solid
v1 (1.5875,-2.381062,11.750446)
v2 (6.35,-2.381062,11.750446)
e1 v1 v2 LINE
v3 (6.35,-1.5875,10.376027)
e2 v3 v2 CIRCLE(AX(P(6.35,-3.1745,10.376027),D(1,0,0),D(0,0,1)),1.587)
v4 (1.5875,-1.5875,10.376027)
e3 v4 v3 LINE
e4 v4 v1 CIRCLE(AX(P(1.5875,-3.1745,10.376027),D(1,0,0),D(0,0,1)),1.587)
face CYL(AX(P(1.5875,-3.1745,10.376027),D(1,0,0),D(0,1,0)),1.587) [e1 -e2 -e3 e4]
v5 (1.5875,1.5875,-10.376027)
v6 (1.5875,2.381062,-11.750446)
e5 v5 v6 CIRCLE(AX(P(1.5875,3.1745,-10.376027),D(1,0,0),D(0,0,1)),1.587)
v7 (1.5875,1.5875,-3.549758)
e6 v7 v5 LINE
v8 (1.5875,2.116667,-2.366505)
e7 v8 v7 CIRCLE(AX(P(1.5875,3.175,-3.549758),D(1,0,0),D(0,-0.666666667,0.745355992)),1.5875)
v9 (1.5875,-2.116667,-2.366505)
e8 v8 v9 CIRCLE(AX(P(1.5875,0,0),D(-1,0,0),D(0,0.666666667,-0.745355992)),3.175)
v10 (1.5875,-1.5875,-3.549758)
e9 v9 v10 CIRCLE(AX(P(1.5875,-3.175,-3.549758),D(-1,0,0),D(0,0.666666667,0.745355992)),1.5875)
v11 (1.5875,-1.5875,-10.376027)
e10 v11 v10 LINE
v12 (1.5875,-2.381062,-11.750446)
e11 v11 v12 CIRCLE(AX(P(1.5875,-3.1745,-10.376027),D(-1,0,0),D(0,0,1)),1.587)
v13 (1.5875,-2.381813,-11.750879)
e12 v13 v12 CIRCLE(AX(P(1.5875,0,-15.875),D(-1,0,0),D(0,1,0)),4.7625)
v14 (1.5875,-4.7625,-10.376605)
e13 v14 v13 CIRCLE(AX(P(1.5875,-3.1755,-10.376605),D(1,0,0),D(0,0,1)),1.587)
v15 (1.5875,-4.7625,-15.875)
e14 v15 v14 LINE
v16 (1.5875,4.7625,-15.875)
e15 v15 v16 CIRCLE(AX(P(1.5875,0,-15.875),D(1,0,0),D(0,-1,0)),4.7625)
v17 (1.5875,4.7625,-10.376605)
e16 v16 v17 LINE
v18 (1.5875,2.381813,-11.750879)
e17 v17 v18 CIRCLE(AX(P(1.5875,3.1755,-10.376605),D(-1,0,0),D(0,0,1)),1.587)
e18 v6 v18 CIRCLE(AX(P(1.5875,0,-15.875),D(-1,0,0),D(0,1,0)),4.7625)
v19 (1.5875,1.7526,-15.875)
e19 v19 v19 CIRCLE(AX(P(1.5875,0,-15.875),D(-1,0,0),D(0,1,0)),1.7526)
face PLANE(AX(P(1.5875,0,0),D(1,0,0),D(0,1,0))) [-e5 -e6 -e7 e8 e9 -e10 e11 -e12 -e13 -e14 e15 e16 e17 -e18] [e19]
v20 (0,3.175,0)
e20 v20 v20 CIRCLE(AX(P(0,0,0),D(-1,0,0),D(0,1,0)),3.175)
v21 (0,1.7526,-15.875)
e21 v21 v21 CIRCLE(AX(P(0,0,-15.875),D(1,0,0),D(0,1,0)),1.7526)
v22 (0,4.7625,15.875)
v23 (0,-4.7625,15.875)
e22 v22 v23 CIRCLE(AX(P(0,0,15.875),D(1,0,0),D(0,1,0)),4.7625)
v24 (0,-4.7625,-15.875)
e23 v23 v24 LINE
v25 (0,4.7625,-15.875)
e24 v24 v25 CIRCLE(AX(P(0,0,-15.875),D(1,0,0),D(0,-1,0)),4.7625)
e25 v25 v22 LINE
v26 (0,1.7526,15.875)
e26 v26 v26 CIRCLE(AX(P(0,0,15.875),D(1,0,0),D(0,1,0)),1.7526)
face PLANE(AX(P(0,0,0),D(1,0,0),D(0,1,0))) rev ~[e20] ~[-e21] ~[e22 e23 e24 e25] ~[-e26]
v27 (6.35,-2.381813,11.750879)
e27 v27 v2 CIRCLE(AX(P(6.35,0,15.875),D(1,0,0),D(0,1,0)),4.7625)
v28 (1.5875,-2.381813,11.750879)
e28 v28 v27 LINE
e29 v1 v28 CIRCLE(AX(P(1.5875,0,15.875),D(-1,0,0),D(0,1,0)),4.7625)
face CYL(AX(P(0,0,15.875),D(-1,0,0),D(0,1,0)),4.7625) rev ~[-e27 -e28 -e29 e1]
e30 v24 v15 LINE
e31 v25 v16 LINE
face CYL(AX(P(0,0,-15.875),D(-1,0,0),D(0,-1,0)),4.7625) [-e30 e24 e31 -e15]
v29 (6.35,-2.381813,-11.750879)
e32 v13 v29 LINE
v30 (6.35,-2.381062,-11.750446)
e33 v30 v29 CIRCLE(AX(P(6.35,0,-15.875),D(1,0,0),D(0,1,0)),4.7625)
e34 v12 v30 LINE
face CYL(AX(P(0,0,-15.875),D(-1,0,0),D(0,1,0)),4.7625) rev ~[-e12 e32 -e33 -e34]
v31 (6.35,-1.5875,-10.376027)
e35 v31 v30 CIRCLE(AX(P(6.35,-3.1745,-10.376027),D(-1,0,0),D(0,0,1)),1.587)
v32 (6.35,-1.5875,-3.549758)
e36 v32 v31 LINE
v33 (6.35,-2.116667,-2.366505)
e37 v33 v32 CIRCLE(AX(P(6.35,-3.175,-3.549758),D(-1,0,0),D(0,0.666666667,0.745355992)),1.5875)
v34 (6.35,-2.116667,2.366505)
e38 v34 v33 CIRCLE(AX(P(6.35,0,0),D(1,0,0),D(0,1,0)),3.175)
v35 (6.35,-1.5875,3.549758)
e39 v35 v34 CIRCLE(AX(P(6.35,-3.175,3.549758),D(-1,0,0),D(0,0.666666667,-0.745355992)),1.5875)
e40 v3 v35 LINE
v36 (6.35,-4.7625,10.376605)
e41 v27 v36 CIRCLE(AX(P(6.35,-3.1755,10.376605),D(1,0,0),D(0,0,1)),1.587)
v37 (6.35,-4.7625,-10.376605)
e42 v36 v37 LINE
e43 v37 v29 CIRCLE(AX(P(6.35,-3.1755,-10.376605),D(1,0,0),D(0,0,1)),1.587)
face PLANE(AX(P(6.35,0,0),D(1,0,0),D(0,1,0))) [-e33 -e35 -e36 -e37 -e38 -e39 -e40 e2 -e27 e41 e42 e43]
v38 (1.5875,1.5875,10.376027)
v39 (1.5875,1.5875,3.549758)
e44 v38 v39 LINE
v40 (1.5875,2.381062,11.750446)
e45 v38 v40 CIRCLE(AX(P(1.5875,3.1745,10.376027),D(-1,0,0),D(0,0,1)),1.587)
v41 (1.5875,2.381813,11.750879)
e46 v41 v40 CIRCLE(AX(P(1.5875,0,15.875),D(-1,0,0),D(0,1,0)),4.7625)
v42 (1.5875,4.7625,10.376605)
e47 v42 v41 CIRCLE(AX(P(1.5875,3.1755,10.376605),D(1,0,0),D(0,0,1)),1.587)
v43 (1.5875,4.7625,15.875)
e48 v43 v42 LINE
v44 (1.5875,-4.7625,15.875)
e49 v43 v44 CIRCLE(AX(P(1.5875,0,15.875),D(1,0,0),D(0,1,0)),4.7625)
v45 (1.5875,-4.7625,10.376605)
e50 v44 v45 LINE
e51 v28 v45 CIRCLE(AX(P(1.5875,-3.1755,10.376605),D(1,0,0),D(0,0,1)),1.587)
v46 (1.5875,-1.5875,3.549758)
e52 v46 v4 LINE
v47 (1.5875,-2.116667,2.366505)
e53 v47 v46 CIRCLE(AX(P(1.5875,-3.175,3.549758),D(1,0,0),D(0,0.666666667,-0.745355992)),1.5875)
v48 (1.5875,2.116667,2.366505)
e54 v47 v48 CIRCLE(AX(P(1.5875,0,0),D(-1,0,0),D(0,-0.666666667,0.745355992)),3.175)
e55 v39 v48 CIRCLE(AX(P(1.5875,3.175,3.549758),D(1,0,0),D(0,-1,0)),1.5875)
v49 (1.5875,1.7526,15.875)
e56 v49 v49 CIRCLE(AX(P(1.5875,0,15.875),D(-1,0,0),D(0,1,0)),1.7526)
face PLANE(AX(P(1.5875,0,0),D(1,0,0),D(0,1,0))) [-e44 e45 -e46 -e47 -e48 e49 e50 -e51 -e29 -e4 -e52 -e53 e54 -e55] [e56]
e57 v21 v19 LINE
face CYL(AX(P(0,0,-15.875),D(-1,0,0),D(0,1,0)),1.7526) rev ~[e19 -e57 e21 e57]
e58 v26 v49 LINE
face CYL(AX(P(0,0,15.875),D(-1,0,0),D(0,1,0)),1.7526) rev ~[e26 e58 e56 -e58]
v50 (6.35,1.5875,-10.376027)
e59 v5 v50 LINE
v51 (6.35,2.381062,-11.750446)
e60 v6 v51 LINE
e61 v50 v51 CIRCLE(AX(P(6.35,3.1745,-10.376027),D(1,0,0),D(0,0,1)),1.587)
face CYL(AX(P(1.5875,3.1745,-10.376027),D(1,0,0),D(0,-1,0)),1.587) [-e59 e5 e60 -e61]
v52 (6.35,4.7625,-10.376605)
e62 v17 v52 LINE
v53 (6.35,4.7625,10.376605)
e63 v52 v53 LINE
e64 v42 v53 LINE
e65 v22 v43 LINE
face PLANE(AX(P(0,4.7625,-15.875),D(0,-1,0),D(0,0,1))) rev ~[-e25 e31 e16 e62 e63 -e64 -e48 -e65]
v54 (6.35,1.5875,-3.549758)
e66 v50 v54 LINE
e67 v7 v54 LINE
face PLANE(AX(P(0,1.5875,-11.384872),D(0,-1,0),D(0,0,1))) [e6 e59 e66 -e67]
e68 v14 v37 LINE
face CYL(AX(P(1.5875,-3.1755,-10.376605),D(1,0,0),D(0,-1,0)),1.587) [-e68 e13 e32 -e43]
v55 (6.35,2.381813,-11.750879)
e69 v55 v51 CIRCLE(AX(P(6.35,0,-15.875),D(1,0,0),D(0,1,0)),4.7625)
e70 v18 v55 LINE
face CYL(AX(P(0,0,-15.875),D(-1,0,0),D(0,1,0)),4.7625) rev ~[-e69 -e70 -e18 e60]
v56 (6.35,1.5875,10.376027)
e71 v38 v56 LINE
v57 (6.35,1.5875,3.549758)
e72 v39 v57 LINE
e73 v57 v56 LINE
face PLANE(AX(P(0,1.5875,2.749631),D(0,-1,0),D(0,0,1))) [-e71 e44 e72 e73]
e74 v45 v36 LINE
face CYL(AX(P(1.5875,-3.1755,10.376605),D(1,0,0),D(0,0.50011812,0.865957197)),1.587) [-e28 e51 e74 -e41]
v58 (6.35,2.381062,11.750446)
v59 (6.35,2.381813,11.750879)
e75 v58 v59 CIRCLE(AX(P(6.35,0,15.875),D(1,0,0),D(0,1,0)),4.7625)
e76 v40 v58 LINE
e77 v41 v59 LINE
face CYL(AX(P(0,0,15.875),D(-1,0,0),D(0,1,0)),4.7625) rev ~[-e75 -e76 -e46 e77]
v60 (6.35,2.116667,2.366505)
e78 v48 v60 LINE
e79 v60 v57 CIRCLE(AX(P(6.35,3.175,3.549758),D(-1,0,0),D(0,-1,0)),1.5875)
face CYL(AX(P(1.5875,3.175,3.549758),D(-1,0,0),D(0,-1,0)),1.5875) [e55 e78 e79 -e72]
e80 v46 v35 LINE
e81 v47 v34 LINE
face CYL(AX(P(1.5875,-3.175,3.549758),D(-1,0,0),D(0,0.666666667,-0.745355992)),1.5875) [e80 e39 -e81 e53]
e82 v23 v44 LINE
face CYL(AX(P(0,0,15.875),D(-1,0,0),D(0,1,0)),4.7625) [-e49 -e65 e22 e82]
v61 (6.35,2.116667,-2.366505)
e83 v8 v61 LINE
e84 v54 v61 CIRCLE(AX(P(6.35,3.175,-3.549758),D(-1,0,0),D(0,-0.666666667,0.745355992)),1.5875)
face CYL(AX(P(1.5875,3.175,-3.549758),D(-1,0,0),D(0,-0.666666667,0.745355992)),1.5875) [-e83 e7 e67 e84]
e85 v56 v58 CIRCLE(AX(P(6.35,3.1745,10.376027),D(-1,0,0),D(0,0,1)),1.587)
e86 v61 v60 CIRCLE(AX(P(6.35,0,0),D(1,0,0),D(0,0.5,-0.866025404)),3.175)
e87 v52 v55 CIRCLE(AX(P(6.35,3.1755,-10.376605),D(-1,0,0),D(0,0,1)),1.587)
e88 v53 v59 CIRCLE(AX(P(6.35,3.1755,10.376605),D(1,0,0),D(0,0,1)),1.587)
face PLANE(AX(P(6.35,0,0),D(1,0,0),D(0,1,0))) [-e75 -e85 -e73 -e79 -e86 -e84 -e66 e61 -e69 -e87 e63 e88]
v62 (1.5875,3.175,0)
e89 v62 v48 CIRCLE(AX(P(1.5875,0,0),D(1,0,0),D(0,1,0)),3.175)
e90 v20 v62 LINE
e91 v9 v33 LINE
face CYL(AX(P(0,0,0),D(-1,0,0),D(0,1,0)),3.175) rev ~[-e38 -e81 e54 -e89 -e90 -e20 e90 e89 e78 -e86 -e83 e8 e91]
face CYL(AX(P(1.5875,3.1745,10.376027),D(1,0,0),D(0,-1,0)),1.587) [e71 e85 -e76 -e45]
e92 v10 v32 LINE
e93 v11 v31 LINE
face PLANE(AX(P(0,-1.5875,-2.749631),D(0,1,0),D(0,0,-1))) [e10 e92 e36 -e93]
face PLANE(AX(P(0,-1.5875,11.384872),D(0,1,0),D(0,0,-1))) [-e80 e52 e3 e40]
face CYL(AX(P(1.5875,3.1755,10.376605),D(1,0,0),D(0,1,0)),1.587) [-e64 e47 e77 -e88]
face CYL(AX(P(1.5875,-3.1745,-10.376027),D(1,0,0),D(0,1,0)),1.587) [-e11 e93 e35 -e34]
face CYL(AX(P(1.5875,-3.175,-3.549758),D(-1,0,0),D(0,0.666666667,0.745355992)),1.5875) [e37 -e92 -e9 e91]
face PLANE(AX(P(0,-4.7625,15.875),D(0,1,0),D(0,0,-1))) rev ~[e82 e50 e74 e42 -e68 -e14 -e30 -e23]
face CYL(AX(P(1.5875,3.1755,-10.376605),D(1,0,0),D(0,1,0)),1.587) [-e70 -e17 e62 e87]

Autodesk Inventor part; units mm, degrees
ref_plane "YZ Plane" through (0, 0, 0) normal (1, 0, 0) x (0, 1, 0)
ref_plane "XZ Plane" through (0, 0, 0) normal (0, 1, 0) x (-1, 0, 0)
ref_plane "XY Plane" through (0, 0, 0) normal (0, 0, 1) x (1, 0, 0)
sketch "Sketch1" plane through (0, 0, 0) normal (1, 0, 0) x (0, 1, 0)
  circle A0 centre (0, 0) radius 3.175
  circle A1 centre (0, 0) radius 15.875 construction
  line L0 (0, 0) -> (0, 15.875) construction
  circle A2 centre (0, 15.875) radius 1.7526
  circle A3 centre (0, -15.875) radius 1.7526
  line L1 (0, 15.875) -> (0, -15.875) construction
  line L2 (-4.7625, 15.875) -> (-4.7625, -15.875)
  line L3 (4.7625, -15.875) -> (4.7625, 15.875)
  arc A4 (4.7625, 15.875) -> (-4.7625, 15.875) centre (0, 15.875) ccw
  arc A5 (-4.7625, -15.875) -> (4.7625, -15.875) centre (0, -15.875) ccw
  line L4 (1.5875, 15.1324) -> (-1.5875, 15.1324) construction
  line L5 (-1.5875, 15.1324) -> (-1.5875, -15.1324)
  line L6 (-1.5875, -15.1324) -> (1.5875, -15.1324) construction
  line L7 (1.5875, -15.1324) -> (1.5875, 15.1324)
  line L8 (1.5875, 15.1324) -> (-1.5875, -15.1324) construction
  line L9 (-1.5875, 15.1324) -> (1.5875, -15.1324) construction
  circle A6 centre (0, 15.875) radius 4.7625
  circle A7 centre (0, -15.875) radius 4.7625
  point P0 (-4.7625, -15.875)
  point P1 (-1.5875, -11.3849)
  point P2 (-1.5875, -2.7496)
  point P3 (-1.5875, 2.7496)
  point P4 (-1.5875, 11.3849)
  point P5 (1.5875, 11.3849)
  point P6 (1.5875, 2.7496)
  point P7 (1.5875, -2.7496)
  point P8 (1.5875, -11.3849)
  dimension "d1" = 31.75
  dimension "d0" = 6.35
  dimension "d2" = 3.5052
  dimension "d5" = 360
  dimension "d7" = 9.525
  dimension "d8" = 3.175
extrude "Extrusion1" add sketch "Sketch1" along normal blind 1.5875 contours A0 L7 A6 L3 A7 | A0 L5 A6 L7 | L7 A7 L5 A0 | A0 L5 A7 L2 A6 | A6 L5 A2 L7 | L7 A2 L5 A6 A4 | A7 A5 L5 A3 L7 | L7 A3 L5 A7
extrude "Extrusion2" add sketch "Sketch1" along normal blind 6.35 contours A0 L7 A6 L3 A7 | A0 L5 A7 L2 A6
fillet "Fillet1" radius 1.5875 8 edges at (3.9687, 4.7625, 15.875) (3.9687, -4.7625, 15.875) (3.9687, 4.7625, -15.875) (3.9687, -4.7625, -15.875) (3.9687, 1.5875, -11.3849) (3.9687, -1.5875, -11.3849) (3.9687, 1.5875, 11.3849) (3.9687, -1.5875, 11.3849)
fillet "Fillet2" radius 1.5875 4 edges at (3.9687, 1.5875, 2.7496) (3.9687, -1.5875, 2.7496) (3.9687, 1.5875, -2.7496) (3.9687, -1.5875, -2.7496)
properties part number "Pin Slot" material "Aluminum 6061"
